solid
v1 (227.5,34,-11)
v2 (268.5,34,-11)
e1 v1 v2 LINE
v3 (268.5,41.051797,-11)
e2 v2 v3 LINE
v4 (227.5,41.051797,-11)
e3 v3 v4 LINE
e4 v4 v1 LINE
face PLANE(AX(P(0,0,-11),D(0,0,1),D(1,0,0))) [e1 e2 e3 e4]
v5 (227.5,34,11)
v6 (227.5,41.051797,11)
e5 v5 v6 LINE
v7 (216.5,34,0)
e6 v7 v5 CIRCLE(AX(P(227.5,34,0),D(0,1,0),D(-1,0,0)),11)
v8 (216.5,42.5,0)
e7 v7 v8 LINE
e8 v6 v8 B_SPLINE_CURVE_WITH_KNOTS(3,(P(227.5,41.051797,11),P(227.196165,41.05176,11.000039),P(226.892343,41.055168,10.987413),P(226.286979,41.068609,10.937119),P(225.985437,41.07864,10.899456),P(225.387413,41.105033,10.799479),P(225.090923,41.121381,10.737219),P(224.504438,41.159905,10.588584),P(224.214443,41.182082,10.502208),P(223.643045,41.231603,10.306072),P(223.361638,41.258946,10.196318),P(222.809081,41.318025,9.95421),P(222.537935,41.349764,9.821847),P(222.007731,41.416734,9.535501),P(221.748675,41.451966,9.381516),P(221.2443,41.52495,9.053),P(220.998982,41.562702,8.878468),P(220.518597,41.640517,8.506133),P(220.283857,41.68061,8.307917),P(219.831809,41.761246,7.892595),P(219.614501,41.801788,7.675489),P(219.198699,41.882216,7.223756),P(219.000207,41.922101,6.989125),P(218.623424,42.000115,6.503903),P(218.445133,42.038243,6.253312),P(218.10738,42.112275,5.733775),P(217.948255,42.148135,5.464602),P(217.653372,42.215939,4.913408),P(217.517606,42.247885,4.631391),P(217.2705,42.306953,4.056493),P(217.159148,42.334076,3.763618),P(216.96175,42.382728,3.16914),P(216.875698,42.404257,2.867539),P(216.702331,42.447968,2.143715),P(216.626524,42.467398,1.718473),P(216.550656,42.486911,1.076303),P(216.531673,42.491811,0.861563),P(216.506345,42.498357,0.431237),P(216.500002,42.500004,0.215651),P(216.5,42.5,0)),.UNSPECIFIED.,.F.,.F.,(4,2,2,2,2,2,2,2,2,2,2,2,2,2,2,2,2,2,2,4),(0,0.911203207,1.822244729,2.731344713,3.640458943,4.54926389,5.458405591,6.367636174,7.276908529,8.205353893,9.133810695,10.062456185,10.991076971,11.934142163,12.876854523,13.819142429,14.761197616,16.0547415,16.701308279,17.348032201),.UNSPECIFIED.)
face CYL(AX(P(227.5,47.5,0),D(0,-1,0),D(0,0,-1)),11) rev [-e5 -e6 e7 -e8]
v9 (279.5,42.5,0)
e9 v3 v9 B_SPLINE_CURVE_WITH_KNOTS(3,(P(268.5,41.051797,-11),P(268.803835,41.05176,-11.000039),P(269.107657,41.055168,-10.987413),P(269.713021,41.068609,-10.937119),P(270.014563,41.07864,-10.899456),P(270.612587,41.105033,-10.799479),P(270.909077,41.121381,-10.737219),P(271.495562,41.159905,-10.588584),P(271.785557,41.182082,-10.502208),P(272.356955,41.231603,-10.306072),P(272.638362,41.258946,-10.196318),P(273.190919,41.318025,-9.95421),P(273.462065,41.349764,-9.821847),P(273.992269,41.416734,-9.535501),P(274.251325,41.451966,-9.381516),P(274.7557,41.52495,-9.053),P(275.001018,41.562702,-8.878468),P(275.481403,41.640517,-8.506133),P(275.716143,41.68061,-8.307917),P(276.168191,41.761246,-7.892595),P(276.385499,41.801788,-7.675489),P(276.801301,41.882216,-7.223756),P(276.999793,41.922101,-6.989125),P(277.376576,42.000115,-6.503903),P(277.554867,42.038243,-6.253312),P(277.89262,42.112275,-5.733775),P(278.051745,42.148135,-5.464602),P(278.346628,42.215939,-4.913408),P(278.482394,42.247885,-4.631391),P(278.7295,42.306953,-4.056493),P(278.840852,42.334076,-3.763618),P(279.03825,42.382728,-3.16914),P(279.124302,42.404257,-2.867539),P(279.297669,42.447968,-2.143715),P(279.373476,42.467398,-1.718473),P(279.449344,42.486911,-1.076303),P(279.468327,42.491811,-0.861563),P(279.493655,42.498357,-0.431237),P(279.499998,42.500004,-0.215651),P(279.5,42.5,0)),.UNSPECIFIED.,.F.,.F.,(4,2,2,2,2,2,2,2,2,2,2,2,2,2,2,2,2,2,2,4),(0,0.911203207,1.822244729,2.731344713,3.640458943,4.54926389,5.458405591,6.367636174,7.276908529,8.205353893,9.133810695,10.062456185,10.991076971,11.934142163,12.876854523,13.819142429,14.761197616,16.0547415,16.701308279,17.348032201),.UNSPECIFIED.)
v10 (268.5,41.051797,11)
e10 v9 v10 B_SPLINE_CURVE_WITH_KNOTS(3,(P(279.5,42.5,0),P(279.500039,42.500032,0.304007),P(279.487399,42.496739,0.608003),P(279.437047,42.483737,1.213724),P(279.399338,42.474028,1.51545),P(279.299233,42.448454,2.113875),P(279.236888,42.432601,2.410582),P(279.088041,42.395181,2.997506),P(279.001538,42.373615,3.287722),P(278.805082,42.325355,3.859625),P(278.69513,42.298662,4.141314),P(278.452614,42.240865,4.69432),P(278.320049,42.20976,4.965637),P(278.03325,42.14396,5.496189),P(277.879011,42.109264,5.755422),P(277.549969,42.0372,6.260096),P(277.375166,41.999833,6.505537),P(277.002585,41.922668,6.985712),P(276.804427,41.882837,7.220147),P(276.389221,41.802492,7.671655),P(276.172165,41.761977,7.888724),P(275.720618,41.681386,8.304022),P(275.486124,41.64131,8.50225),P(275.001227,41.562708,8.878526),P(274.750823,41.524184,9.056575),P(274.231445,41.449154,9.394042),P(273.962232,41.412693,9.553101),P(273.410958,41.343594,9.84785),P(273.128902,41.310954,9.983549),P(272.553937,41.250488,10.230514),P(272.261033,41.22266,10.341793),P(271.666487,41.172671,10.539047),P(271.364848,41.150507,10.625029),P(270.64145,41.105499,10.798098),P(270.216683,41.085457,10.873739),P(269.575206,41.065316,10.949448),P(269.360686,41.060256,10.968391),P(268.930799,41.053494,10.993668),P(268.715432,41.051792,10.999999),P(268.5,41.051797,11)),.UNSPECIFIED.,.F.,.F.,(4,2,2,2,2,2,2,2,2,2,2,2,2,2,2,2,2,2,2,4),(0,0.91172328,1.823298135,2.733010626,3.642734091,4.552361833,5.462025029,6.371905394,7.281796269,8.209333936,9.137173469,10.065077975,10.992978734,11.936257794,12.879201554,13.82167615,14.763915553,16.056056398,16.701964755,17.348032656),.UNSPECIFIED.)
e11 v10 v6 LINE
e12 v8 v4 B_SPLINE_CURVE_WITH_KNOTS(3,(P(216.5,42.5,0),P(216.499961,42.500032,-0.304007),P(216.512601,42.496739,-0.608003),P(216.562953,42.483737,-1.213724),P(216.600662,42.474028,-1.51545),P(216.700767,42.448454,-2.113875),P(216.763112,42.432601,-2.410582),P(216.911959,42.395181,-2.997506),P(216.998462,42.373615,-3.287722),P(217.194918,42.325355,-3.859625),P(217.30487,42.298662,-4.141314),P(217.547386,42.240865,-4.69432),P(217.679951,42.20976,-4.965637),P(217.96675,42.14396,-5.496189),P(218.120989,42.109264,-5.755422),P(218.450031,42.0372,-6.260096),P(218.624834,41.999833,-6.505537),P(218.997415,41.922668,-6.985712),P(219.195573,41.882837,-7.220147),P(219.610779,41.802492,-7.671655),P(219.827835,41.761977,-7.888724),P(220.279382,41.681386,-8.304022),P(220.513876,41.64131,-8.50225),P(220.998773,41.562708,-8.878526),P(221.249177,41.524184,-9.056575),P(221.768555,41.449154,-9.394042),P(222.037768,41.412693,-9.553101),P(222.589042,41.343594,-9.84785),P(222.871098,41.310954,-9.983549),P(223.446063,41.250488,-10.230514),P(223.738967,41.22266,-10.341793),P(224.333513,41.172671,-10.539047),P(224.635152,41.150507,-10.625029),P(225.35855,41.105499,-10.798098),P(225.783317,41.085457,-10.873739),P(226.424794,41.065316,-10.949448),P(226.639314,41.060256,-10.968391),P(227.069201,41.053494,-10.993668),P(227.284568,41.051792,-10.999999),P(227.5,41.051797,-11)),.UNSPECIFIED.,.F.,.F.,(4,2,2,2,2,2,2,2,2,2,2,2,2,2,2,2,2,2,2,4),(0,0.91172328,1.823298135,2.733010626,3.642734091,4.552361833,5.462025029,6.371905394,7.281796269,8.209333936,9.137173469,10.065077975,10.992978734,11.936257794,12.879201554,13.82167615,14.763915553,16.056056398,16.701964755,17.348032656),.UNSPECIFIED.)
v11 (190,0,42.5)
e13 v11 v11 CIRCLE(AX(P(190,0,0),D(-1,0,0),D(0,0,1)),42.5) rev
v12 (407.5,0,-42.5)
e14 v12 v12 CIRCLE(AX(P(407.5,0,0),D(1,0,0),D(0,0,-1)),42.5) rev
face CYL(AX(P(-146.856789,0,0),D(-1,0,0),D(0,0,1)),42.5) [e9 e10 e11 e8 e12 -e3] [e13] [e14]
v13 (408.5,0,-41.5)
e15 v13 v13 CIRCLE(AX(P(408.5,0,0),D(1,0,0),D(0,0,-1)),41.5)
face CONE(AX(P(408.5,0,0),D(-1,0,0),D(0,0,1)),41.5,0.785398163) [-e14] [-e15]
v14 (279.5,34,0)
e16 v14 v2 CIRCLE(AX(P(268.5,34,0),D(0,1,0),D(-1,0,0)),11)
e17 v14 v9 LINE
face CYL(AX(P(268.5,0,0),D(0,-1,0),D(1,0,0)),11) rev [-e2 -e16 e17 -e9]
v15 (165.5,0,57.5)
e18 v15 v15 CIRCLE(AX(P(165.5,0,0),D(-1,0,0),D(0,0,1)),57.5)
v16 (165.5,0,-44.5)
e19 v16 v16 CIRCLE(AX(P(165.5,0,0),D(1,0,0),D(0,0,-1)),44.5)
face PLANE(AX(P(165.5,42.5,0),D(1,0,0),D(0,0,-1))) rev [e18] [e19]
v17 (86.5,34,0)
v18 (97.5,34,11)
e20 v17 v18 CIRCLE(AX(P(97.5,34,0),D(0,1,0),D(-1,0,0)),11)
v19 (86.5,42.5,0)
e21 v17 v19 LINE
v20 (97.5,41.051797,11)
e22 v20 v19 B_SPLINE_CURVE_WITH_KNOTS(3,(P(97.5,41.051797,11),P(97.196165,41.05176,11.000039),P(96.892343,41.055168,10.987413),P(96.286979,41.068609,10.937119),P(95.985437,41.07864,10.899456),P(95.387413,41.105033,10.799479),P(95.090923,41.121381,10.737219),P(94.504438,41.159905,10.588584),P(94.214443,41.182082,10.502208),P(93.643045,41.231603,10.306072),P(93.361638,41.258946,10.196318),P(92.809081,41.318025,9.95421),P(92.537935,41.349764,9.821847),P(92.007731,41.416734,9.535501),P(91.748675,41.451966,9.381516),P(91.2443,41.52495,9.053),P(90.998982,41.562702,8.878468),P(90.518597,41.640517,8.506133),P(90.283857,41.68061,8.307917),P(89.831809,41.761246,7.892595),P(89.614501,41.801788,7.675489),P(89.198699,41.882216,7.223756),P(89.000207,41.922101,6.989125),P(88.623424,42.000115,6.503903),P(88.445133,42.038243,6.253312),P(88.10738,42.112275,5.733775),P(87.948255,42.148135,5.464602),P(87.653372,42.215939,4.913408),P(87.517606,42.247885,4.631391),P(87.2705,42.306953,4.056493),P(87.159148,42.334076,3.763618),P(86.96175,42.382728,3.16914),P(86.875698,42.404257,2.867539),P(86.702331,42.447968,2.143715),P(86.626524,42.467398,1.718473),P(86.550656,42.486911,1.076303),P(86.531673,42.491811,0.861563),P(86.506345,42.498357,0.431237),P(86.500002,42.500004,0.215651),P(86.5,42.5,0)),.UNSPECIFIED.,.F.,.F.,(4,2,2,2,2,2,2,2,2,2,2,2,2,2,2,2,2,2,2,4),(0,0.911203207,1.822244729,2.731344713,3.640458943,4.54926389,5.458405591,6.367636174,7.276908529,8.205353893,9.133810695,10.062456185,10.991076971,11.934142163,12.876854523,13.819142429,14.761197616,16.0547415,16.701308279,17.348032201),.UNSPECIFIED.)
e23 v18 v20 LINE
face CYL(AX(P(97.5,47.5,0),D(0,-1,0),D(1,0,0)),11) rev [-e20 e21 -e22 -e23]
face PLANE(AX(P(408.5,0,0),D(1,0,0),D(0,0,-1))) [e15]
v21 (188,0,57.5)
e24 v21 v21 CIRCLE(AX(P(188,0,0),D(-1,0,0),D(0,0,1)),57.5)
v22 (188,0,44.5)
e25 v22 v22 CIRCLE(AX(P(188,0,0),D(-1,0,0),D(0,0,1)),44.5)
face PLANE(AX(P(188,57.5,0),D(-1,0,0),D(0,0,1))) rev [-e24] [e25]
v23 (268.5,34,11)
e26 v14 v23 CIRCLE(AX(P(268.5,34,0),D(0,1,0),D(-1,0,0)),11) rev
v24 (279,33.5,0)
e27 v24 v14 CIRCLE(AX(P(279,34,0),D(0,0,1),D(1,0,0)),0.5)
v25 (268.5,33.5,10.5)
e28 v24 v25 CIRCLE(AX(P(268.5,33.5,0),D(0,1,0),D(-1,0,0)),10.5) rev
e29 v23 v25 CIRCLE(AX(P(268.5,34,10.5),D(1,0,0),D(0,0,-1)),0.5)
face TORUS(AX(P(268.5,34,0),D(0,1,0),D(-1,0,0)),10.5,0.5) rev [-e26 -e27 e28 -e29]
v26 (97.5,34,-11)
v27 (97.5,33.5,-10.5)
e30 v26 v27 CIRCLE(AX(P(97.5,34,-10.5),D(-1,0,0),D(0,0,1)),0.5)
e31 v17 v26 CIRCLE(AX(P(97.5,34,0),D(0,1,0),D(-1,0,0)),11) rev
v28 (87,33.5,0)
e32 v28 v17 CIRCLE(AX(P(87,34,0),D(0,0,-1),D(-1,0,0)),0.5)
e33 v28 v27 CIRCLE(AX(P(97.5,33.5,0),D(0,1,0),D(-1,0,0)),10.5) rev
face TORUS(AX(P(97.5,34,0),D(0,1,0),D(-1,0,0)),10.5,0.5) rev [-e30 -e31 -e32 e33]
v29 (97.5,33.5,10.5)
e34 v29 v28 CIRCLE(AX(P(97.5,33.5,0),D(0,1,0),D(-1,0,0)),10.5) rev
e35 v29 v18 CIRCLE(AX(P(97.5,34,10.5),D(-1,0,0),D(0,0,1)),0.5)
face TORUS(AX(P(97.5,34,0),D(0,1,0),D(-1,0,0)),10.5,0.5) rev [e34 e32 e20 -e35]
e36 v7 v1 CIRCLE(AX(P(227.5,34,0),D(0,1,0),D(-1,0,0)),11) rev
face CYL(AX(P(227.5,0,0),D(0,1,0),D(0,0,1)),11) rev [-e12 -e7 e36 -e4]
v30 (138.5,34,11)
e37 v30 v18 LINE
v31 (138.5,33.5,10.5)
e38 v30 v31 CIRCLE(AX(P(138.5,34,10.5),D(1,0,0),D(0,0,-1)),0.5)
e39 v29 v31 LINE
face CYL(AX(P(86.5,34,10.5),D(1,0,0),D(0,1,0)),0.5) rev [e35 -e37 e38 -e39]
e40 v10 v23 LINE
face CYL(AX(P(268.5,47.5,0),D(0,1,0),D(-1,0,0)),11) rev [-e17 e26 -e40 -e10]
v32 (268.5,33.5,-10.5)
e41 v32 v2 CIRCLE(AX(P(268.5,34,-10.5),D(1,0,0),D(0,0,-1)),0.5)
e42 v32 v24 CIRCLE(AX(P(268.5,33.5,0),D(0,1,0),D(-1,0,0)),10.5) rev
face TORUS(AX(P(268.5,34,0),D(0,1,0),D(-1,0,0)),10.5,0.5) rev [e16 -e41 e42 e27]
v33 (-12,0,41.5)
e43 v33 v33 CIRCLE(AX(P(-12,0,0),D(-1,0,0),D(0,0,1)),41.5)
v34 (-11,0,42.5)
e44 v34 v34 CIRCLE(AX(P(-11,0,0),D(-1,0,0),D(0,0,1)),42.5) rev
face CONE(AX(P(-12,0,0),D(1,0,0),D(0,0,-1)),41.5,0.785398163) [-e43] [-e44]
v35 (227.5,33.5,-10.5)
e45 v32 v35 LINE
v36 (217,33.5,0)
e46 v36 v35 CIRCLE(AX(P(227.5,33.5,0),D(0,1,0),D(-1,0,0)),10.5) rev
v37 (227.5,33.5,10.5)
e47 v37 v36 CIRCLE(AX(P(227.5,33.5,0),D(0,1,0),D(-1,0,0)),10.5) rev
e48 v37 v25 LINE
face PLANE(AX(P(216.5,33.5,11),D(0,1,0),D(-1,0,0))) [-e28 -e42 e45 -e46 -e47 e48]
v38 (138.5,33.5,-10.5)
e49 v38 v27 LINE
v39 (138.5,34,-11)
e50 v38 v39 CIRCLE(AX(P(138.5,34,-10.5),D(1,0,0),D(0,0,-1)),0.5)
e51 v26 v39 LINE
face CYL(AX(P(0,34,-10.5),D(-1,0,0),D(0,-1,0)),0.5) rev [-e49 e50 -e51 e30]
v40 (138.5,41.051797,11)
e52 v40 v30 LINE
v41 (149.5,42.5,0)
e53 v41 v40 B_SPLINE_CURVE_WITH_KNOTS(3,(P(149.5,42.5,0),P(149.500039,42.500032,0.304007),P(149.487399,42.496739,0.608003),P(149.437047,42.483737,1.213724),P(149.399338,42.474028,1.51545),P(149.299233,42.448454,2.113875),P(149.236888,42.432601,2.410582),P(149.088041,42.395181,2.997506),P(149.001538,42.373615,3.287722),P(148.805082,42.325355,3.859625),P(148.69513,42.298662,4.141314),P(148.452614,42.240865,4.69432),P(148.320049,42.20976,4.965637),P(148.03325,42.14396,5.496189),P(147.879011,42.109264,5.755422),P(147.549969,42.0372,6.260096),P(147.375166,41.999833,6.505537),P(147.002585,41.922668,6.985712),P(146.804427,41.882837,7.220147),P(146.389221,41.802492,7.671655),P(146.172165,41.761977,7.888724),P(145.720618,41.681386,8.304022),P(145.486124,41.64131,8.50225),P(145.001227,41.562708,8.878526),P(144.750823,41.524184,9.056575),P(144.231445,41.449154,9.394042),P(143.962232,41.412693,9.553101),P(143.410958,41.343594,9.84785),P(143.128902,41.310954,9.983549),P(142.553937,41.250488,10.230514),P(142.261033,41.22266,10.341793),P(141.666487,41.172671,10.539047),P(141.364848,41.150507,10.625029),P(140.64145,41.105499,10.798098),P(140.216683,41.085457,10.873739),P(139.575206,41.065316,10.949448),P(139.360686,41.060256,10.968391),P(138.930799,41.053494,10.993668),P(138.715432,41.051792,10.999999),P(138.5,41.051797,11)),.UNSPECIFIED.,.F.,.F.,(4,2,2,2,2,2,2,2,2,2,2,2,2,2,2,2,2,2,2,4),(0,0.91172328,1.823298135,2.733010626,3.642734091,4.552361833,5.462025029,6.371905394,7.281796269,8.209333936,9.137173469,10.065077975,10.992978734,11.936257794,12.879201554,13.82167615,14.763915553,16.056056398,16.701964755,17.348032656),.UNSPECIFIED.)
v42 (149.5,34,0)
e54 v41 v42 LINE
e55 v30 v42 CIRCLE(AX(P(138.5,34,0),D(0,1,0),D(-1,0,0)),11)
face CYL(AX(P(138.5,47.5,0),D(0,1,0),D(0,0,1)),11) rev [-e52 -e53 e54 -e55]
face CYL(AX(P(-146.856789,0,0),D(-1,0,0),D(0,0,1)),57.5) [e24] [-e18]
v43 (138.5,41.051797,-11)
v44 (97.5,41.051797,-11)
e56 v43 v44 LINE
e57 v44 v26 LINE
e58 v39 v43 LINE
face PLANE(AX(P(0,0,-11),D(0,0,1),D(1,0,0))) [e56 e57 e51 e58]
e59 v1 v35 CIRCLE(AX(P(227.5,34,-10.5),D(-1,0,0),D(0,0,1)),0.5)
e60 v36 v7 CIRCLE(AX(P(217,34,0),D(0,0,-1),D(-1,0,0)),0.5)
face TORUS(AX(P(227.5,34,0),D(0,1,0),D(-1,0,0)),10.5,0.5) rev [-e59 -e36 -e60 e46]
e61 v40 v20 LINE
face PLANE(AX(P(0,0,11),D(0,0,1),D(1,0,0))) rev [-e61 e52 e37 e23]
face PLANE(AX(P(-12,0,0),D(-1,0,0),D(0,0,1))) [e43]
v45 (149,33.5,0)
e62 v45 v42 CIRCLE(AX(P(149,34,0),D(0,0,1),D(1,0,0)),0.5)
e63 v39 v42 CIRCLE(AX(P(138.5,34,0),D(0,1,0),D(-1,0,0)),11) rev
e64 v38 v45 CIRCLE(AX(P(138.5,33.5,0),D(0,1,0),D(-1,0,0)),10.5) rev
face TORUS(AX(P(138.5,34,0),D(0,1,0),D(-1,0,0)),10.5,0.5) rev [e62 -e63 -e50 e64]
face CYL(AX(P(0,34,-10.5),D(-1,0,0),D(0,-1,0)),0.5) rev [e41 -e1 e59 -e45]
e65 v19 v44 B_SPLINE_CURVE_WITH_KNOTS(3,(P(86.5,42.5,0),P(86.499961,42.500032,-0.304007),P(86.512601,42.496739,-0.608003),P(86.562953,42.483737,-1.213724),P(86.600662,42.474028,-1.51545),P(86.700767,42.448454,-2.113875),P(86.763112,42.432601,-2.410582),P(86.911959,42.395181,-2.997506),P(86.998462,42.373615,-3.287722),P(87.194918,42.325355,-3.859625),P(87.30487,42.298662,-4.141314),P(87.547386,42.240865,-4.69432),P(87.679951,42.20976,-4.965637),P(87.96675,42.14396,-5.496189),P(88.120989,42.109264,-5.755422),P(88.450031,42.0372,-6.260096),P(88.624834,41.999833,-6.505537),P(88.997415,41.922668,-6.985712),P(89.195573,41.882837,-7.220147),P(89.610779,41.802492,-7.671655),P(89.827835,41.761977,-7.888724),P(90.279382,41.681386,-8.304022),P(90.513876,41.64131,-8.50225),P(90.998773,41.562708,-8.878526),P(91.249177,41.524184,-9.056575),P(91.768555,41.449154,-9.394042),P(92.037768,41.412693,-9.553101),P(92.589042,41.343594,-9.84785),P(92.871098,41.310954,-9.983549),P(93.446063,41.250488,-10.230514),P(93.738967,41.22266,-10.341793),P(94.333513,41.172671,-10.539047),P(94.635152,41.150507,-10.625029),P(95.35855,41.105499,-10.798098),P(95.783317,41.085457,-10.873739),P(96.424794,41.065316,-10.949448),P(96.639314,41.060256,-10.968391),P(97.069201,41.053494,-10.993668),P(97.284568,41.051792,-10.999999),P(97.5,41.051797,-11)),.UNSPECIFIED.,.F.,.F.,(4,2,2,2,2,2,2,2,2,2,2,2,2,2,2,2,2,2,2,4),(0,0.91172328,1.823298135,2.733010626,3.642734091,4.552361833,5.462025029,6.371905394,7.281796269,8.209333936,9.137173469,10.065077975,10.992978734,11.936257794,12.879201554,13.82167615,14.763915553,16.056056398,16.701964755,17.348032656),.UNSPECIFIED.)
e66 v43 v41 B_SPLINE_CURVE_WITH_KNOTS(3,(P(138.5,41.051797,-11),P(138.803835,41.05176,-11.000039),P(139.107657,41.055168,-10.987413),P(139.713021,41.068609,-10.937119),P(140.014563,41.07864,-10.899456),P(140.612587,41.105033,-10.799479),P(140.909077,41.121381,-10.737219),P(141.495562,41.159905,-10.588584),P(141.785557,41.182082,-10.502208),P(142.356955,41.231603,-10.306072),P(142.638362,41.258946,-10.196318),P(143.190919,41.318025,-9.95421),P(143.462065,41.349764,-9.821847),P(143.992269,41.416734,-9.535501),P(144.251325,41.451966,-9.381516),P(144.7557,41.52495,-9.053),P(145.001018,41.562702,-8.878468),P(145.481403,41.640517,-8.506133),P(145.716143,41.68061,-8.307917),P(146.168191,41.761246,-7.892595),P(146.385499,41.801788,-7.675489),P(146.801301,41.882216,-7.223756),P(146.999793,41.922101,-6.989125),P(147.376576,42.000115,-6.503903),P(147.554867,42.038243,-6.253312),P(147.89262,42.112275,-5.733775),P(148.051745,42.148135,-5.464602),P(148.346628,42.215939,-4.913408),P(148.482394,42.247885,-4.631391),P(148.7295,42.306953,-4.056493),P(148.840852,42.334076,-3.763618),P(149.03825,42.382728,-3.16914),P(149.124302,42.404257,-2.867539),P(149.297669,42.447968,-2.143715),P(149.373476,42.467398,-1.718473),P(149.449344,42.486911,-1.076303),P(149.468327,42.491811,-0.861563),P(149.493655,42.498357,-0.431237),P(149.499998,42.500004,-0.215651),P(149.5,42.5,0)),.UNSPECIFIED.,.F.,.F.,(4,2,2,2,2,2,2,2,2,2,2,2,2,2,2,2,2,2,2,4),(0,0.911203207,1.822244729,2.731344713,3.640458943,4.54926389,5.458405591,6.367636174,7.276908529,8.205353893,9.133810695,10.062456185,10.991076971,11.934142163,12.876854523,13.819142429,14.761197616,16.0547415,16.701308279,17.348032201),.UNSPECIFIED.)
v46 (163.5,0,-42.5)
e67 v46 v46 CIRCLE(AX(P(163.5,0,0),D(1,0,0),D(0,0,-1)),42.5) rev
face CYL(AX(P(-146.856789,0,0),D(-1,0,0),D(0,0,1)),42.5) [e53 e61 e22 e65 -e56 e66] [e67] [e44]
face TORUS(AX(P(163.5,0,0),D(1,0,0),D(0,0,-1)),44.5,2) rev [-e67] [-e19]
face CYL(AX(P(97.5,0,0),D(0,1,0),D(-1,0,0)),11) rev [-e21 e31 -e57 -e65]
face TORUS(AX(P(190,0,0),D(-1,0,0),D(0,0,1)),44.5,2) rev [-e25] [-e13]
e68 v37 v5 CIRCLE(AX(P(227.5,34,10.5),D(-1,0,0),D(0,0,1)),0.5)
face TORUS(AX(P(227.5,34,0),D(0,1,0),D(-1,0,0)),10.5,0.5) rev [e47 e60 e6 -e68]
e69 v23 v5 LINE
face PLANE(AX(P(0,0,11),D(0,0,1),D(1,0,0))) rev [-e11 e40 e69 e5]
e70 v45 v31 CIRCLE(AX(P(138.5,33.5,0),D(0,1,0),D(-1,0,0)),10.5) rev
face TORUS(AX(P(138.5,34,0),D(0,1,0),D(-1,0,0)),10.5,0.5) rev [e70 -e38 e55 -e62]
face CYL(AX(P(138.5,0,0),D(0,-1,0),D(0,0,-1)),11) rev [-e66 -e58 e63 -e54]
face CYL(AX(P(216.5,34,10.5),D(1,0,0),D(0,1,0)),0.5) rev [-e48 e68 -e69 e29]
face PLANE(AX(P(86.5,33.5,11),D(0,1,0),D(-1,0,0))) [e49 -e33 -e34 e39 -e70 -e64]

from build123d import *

# Parameters (mm, degrees)
TAGLIO_ESTRUSIONE1_DEPTH      = 11
TAGLIO_ESTRUSIONE1_DEPTH_BACK = 11
SCHIZZO2_W                    = 63
SCHIZZO2_H                    = 14
RACCORDO1_R                   = 0.5
RACCORDO2_R                   = 11
ESTRUSIONE_ESTRUSIONE1_START  = 30
SCHIZZO3_R                    = 42.5
ESTRUSIONE_ESTRUSIONE1_DEPTH  = 30
SCHIZZO4_R                    = 42.5
ESTRUSIONE_ESTRUSIONE2_DEPTH  = 12
RACCORDO3_R                   = 2
SMUSSO1_SIZE                  = 1


with BuildPart() as part:
    # Schizzo1 → Rivoluzione1 (revolve)
    with BuildSketch(Plane.XY, mode=Mode.PRIVATE) as rivoluzione1_sk:
        Polygon((0, 0), (0, 42.5), (165.5, 42.5), (165.5, 57.5), (188, 57.5), (188, 42.5), (378.5, 42.5), (378.5, 0), align=None)
    revolve(rivoluzione1_sk.sketch.rotate(Axis((-146.856788593, 0, 0), (1, 0, 0)), 90), axis=Axis((-146.856788593, 0, 0), (1, 0, 0)))

    # Schizzo2 → Taglio-Estrusione1 (cut, two sides: drawn at the far end of the back side and taken through both)
    with BuildSketch(Plane.XY.offset(-TAGLIO_ESTRUSIONE1_DEPTH_BACK)):
        with Locations((118, 40.5)):
            Rectangle(SCHIZZO2_W, SCHIZZO2_H)
        with Locations((248, 40.5)):
            Rectangle(SCHIZZO2_W, SCHIZZO2_H)
    extrude(amount=TAGLIO_ESTRUSIONE1_DEPTH + TAGLIO_ESTRUSIONE1_DEPTH_BACK, mode=Mode.SUBTRACT)

    # Raccordo1
    raccordo1_edges = [part.edges().sort_by_distance(p)[0] for p in [
        (149.5, 33.5, 0),
        (118, 33.5, 11),
        (86.5, 33.5, 0),
        (118, 33.5, -11),
        (279.5, 33.5, 0),
        (248, 33.5, 11),
        (216.5, 33.5, 0),
        (248, 33.5, -11),
    ]]
    fillet(raccordo1_edges, radius=RACCORDO1_R)

    # Raccordo2
    # the kernel refuses this fillet: 11 mm, written as the material it adds along each edge
    with BuildSketch(Plane(origin=(268.5, 33.5, 0), x_dir=(0, 0, -1), z_dir=(-1, 0, 0))) as raccordo2_piece_1:
        with BuildLine():
            CenterArc((10.5, -0.5), 0.5, 0, 90)
            Line((11, -0.5), (11, 0))
            Line((11, 0), (10.5, 0))
        make_face()
    revolve(axis=Axis((268.5, 33.5, 0), (0, -1, 0)), revolution_arc=90)
    with BuildSketch(Plane(origin=(268.5, 33.5, 0), x_dir=(1, 0, 0), z_dir=(0, 0, -1))) as raccordo2_piece_2:
        with BuildLine():
            CenterArc((10.5, -0.5), 0.5, 0, 90)
            Line((11, -0.5), (11, 0))
            Line((11, 0), (10.5, 0))
        make_face()
    revolve(axis=Axis((268.5, 33.5, 0), (0, -1, 0)), revolution_arc=90)
    with BuildSketch(Plane(origin=(227.5, 33.5, 0), x_dir=(0, 0, 1), z_dir=(1, 0, 0))) as raccordo2_piece_3:
        with BuildLine():
            CenterArc((10.5, -0.5), 0.5, 0, 90)
            Line((11, -0.5), (11, 0))
            Line((11, 0), (10.5, 0))
        make_face()
    revolve(axis=Axis((227.5, 33.5, 0), (0, -1, 0)), revolution_arc=90)
    with BuildSketch(Plane(origin=(227.5, 33.5, 0), x_dir=(-1, 0, 0), z_dir=(0, 0, 1))) as raccordo2_piece_4:
        with BuildLine():
            CenterArc((10.5, -0.5), 0.5, 0, 90)
            Line((11, -0.5), (11, 0))
            Line((11, 0), (10.5, 0))
        make_face()
    revolve(axis=Axis((227.5, 33.5, 0), (0, -1, 0)), revolution_arc=90)
    with BuildSketch(Plane(origin=(138.5, 33.5, 0), x_dir=(1, 0, 0), z_dir=(0, 0, -1))) as raccordo2_piece_5:
        with BuildLine():
            CenterArc((10.5, -0.5), 0.5, 0, 90)
            Line((11, -0.5), (11, 0))
            Line((11, 0), (10.5, 0))
        make_face()
    revolve(axis=Axis((138.5, 33.5, 0), (0, -1, 0)), revolution_arc=90)
    with BuildSketch(Plane(origin=(138.5, 33.5, 0), x_dir=(0, 0, -1), z_dir=(-1, 0, 0))) as raccordo2_piece_6:
        with BuildLine():
            CenterArc((10.5, -0.5), 0.5, 0, 90)
            Line((11, -0.5), (11, 0))
            Line((11, 0), (10.5, 0))
        make_face()
    revolve(axis=Axis((138.5, 33.5, 0), (0, -1, 0)), revolution_arc=90)
    with BuildSketch(Plane(origin=(97.5, 33.5, 0), x_dir=(0, 0, 1), z_dir=(1, 0, 0))) as raccordo2_piece_7:
        with BuildLine():
            CenterArc((10.5, -0.5), 0.5, 0, 90)
            Line((11, -0.5), (11, 0))
            Line((11, 0), (10.5, 0))
        make_face()
    revolve(axis=Axis((97.5, 33.5, 0), (0, -1, 0)), revolution_arc=90)
    with BuildSketch(Plane(origin=(97.5, 33.5, 0), x_dir=(-1, 0, 0), z_dir=(0, 0, 1))) as raccordo2_piece_8:
        with BuildLine():
            CenterArc((10.5, -0.5), 0.5, 0, 90)
            Line((11, -0.5), (11, 0))
            Line((11, 0), (10.5, 0))
        make_face()
    revolve(axis=Axis((97.5, 33.5, 0), (0, -1, 0)), revolution_arc=90)
    with BuildSketch(Plane(origin=(86.5, 33.5, -11), x_dir=(0, 0, 1), z_dir=(0, 1, 0))) as raccordo2_piece_9_section:
        with BuildLine():
            CenterArc((RACCORDO2_R, RACCORDO2_R), RACCORDO2_R, 180, 90)
            Line((0, RACCORDO2_R), (0, 0))
            Line((0, 0), (RACCORDO2_R, 0))
        make_face()
    raccordo2_piece_9 = extrude(amount=35.05179655, mode=Mode.PRIVATE)
    raccordo2_piece_9 = raccordo2_piece_9 & Plane(origin=(88.913570228, 0, 0), x_dir=(0, 0, 1), z_dir=(1, 0, 0)) * Cylinder(42.5, 115, mode=Mode.PRIVATE)
    add(raccordo2_piece_9)
    with BuildSketch(Plane(origin=(86.5, 33.5, 11), x_dir=(0, 0, -1), z_dir=(0, 1, 0))) as raccordo2_piece_10_section:
        with BuildLine():
            CenterArc((RACCORDO2_R, -RACCORDO2_R), RACCORDO2_R, 90, 90)
            Line((0, -RACCORDO2_R), (0, 0))
            Line((0, 0), (RACCORDO2_R, 0))
        make_face()
    raccordo2_piece_10 = extrude(amount=35.05179655, mode=Mode.PRIVATE)
    raccordo2_piece_10 = raccordo2_piece_10 & Plane(origin=(88.913567526, 0, 0), x_dir=(0, 0, 1), z_dir=(1, 0, 0)) * Cylinder(42.5, 115, mode=Mode.PRIVATE)
    add(raccordo2_piece_10)
    with BuildSketch(Plane(origin=(149.5, 68.55179655, -11), x_dir=(-1, 0, 0), z_dir=(0, -1, 0))) as raccordo2_piece_11_section:
        with BuildLine():
            CenterArc((RACCORDO2_R, -RACCORDO2_R), RACCORDO2_R, 90, 90)
            Line((0, -RACCORDO2_R), (0, 0))
            Line((0, 0), (RACCORDO2_R, 0))
        make_face()
    raccordo2_piece_11 = extrude(amount=35.05179655, mode=Mode.PRIVATE)
    raccordo2_piece_11 = raccordo2_piece_11 & Plane(origin=(147.086427886, 0, 0), x_dir=(0, 0, 1), z_dir=(1, 0, 0)) * Cylinder(42.5, 115, mode=Mode.PRIVATE)
    add(raccordo2_piece_11)
    with BuildSketch(Plane(origin=(149.5, 68.55179655, 11), x_dir=(-1, 0, 0), z_dir=(0, -1, 0))) as raccordo2_piece_12_section:
        with BuildLine():
            CenterArc((RACCORDO2_R, RACCORDO2_R), RACCORDO2_R, 180, 90)
            Line((0, RACCORDO2_R), (0, 0))
            Line((0, 0), (RACCORDO2_R, 0))
        make_face()
    raccordo2_piece_12 = extrude(amount=35.05179655, mode=Mode.PRIVATE)
    raccordo2_piece_12 = raccordo2_piece_12 & Plane(origin=(147.086433525, 0, 0), x_dir=(0, 0, 1), z_dir=(1, 0, 0)) * Cylinder(42.5, 115, mode=Mode.PRIVATE)
    add(raccordo2_piece_12)
    with BuildSketch(Plane(origin=(216.5, 33.5, -11), x_dir=(0, 0, 1), z_dir=(0, 1, 0))) as raccordo2_piece_13_section:
        with BuildLine():
            CenterArc((RACCORDO2_R, RACCORDO2_R), RACCORDO2_R, 180, 90)
            Line((0, RACCORDO2_R), (0, 0))
            Line((0, 0), (RACCORDO2_R, 0))
        make_face()
    raccordo2_piece_13 = extrude(amount=35.05179655, mode=Mode.PRIVATE)
    raccordo2_piece_13 = raccordo2_piece_13 & Plane(origin=(218.913570228, 0, 0), x_dir=(0, 0, 1), z_dir=(1, 0, 0)) * Cylinder(42.5, 115, mode=Mode.PRIVATE)
    add(raccordo2_piece_13)
    with BuildSketch(Plane(origin=(216.5, 33.5, 11), x_dir=(0, 0, -1), z_dir=(0, 1, 0))) as raccordo2_piece_14_section:
        with BuildLine():
            CenterArc((RACCORDO2_R, -RACCORDO2_R), RACCORDO2_R, 90, 90)
            Line((0, -RACCORDO2_R), (0, 0))
            Line((0, 0), (RACCORDO2_R, 0))
        make_face()
    raccordo2_piece_14 = extrude(amount=35.05179655, mode=Mode.PRIVATE)
    raccordo2_piece_14 = raccordo2_piece_14 & Plane(origin=(218.913567526, 0, 0), x_dir=(0, 0, 1), z_dir=(1, 0, 0)) * Cylinder(42.5, 115, mode=Mode.PRIVATE)
    add(raccordo2_piece_14)
    with BuildSketch(Plane(origin=(279.5, 68.55179655, 11), x_dir=(-1, 0, 0), z_dir=(0, -1, 0))) as raccordo2_piece_15_section:
        with BuildLine():
            CenterArc((RACCORDO2_R, RACCORDO2_R), RACCORDO2_R, 180, 90)
            Line((0, RACCORDO2_R), (0, 0))
            Line((0, 0), (RACCORDO2_R, 0))
        make_face()
    raccordo2_piece_15 = extrude(amount=35.05179655, mode=Mode.PRIVATE)
    raccordo2_piece_15 = raccordo2_piece_15 & Plane(origin=(277.086433525, 0, 0), x_dir=(0, 0, 1), z_dir=(1, 0, 0)) * Cylinder(42.5, 115, mode=Mode.PRIVATE)
    add(raccordo2_piece_15)
    with BuildSketch(Plane(origin=(279.5, 68.55179655, -11), x_dir=(0, 0, 1), z_dir=(0, -1, 0))) as raccordo2_piece_16_section:
        with BuildLine():
            CenterArc((RACCORDO2_R, RACCORDO2_R), RACCORDO2_R, 180, 90)
            Line((0, RACCORDO2_R), (0, 0))
            Line((0, 0), (RACCORDO2_R, 0))
        make_face()
    raccordo2_piece_16 = extrude(amount=35.05179655, mode=Mode.PRIVATE)
    raccordo2_piece_16 = raccordo2_piece_16 & Plane(origin=(277.086429772, 0, 0), x_dir=(0, 0, 1), z_dir=(1, 0, 0)) * Cylinder(42.5, 115, mode=Mode.PRIVATE)
    add(raccordo2_piece_16)

    # Schizzo3 → Estrusione-Estrusione1 (add)
    with BuildSketch(Plane(origin=(378.5, 0, 0), x_dir=(0, 0, -1), z_dir=(1, 0, 0)).offset(ESTRUSIONE_ESTRUSIONE1_START)):
        with Locations(Location((0, 0, 0), (0, 0, 180))):
            Circle(SCHIZZO3_R)
    extrude(amount=-ESTRUSIONE_ESTRUSIONE1_DEPTH)

    # Schizzo4 → Estrusione-Estrusione2 (add)
    with BuildSketch(Plane.ZY):
        Circle(SCHIZZO4_R)
    extrude(amount=ESTRUSIONE_ESTRUSIONE2_DEPTH)

    # Raccordo3
    raccordo3_edges = [part.edges().sort_by_distance(p)[0] for p in [
        (188, 0, -42.5),
        (165.5, 0, -42.5),
    ]]
    fillet(raccordo3_edges, radius=RACCORDO3_R)

    # Smusso1
    smusso1_edges = [part.edges().sort_by_distance(p)[0] for p in [
        (408.5, 0, -42.5),
        (-12, 0, -42.5),
    ]]
    chamfer(smusso1_edges, length=SMUSSO1_SIZE)


solid = part.part
